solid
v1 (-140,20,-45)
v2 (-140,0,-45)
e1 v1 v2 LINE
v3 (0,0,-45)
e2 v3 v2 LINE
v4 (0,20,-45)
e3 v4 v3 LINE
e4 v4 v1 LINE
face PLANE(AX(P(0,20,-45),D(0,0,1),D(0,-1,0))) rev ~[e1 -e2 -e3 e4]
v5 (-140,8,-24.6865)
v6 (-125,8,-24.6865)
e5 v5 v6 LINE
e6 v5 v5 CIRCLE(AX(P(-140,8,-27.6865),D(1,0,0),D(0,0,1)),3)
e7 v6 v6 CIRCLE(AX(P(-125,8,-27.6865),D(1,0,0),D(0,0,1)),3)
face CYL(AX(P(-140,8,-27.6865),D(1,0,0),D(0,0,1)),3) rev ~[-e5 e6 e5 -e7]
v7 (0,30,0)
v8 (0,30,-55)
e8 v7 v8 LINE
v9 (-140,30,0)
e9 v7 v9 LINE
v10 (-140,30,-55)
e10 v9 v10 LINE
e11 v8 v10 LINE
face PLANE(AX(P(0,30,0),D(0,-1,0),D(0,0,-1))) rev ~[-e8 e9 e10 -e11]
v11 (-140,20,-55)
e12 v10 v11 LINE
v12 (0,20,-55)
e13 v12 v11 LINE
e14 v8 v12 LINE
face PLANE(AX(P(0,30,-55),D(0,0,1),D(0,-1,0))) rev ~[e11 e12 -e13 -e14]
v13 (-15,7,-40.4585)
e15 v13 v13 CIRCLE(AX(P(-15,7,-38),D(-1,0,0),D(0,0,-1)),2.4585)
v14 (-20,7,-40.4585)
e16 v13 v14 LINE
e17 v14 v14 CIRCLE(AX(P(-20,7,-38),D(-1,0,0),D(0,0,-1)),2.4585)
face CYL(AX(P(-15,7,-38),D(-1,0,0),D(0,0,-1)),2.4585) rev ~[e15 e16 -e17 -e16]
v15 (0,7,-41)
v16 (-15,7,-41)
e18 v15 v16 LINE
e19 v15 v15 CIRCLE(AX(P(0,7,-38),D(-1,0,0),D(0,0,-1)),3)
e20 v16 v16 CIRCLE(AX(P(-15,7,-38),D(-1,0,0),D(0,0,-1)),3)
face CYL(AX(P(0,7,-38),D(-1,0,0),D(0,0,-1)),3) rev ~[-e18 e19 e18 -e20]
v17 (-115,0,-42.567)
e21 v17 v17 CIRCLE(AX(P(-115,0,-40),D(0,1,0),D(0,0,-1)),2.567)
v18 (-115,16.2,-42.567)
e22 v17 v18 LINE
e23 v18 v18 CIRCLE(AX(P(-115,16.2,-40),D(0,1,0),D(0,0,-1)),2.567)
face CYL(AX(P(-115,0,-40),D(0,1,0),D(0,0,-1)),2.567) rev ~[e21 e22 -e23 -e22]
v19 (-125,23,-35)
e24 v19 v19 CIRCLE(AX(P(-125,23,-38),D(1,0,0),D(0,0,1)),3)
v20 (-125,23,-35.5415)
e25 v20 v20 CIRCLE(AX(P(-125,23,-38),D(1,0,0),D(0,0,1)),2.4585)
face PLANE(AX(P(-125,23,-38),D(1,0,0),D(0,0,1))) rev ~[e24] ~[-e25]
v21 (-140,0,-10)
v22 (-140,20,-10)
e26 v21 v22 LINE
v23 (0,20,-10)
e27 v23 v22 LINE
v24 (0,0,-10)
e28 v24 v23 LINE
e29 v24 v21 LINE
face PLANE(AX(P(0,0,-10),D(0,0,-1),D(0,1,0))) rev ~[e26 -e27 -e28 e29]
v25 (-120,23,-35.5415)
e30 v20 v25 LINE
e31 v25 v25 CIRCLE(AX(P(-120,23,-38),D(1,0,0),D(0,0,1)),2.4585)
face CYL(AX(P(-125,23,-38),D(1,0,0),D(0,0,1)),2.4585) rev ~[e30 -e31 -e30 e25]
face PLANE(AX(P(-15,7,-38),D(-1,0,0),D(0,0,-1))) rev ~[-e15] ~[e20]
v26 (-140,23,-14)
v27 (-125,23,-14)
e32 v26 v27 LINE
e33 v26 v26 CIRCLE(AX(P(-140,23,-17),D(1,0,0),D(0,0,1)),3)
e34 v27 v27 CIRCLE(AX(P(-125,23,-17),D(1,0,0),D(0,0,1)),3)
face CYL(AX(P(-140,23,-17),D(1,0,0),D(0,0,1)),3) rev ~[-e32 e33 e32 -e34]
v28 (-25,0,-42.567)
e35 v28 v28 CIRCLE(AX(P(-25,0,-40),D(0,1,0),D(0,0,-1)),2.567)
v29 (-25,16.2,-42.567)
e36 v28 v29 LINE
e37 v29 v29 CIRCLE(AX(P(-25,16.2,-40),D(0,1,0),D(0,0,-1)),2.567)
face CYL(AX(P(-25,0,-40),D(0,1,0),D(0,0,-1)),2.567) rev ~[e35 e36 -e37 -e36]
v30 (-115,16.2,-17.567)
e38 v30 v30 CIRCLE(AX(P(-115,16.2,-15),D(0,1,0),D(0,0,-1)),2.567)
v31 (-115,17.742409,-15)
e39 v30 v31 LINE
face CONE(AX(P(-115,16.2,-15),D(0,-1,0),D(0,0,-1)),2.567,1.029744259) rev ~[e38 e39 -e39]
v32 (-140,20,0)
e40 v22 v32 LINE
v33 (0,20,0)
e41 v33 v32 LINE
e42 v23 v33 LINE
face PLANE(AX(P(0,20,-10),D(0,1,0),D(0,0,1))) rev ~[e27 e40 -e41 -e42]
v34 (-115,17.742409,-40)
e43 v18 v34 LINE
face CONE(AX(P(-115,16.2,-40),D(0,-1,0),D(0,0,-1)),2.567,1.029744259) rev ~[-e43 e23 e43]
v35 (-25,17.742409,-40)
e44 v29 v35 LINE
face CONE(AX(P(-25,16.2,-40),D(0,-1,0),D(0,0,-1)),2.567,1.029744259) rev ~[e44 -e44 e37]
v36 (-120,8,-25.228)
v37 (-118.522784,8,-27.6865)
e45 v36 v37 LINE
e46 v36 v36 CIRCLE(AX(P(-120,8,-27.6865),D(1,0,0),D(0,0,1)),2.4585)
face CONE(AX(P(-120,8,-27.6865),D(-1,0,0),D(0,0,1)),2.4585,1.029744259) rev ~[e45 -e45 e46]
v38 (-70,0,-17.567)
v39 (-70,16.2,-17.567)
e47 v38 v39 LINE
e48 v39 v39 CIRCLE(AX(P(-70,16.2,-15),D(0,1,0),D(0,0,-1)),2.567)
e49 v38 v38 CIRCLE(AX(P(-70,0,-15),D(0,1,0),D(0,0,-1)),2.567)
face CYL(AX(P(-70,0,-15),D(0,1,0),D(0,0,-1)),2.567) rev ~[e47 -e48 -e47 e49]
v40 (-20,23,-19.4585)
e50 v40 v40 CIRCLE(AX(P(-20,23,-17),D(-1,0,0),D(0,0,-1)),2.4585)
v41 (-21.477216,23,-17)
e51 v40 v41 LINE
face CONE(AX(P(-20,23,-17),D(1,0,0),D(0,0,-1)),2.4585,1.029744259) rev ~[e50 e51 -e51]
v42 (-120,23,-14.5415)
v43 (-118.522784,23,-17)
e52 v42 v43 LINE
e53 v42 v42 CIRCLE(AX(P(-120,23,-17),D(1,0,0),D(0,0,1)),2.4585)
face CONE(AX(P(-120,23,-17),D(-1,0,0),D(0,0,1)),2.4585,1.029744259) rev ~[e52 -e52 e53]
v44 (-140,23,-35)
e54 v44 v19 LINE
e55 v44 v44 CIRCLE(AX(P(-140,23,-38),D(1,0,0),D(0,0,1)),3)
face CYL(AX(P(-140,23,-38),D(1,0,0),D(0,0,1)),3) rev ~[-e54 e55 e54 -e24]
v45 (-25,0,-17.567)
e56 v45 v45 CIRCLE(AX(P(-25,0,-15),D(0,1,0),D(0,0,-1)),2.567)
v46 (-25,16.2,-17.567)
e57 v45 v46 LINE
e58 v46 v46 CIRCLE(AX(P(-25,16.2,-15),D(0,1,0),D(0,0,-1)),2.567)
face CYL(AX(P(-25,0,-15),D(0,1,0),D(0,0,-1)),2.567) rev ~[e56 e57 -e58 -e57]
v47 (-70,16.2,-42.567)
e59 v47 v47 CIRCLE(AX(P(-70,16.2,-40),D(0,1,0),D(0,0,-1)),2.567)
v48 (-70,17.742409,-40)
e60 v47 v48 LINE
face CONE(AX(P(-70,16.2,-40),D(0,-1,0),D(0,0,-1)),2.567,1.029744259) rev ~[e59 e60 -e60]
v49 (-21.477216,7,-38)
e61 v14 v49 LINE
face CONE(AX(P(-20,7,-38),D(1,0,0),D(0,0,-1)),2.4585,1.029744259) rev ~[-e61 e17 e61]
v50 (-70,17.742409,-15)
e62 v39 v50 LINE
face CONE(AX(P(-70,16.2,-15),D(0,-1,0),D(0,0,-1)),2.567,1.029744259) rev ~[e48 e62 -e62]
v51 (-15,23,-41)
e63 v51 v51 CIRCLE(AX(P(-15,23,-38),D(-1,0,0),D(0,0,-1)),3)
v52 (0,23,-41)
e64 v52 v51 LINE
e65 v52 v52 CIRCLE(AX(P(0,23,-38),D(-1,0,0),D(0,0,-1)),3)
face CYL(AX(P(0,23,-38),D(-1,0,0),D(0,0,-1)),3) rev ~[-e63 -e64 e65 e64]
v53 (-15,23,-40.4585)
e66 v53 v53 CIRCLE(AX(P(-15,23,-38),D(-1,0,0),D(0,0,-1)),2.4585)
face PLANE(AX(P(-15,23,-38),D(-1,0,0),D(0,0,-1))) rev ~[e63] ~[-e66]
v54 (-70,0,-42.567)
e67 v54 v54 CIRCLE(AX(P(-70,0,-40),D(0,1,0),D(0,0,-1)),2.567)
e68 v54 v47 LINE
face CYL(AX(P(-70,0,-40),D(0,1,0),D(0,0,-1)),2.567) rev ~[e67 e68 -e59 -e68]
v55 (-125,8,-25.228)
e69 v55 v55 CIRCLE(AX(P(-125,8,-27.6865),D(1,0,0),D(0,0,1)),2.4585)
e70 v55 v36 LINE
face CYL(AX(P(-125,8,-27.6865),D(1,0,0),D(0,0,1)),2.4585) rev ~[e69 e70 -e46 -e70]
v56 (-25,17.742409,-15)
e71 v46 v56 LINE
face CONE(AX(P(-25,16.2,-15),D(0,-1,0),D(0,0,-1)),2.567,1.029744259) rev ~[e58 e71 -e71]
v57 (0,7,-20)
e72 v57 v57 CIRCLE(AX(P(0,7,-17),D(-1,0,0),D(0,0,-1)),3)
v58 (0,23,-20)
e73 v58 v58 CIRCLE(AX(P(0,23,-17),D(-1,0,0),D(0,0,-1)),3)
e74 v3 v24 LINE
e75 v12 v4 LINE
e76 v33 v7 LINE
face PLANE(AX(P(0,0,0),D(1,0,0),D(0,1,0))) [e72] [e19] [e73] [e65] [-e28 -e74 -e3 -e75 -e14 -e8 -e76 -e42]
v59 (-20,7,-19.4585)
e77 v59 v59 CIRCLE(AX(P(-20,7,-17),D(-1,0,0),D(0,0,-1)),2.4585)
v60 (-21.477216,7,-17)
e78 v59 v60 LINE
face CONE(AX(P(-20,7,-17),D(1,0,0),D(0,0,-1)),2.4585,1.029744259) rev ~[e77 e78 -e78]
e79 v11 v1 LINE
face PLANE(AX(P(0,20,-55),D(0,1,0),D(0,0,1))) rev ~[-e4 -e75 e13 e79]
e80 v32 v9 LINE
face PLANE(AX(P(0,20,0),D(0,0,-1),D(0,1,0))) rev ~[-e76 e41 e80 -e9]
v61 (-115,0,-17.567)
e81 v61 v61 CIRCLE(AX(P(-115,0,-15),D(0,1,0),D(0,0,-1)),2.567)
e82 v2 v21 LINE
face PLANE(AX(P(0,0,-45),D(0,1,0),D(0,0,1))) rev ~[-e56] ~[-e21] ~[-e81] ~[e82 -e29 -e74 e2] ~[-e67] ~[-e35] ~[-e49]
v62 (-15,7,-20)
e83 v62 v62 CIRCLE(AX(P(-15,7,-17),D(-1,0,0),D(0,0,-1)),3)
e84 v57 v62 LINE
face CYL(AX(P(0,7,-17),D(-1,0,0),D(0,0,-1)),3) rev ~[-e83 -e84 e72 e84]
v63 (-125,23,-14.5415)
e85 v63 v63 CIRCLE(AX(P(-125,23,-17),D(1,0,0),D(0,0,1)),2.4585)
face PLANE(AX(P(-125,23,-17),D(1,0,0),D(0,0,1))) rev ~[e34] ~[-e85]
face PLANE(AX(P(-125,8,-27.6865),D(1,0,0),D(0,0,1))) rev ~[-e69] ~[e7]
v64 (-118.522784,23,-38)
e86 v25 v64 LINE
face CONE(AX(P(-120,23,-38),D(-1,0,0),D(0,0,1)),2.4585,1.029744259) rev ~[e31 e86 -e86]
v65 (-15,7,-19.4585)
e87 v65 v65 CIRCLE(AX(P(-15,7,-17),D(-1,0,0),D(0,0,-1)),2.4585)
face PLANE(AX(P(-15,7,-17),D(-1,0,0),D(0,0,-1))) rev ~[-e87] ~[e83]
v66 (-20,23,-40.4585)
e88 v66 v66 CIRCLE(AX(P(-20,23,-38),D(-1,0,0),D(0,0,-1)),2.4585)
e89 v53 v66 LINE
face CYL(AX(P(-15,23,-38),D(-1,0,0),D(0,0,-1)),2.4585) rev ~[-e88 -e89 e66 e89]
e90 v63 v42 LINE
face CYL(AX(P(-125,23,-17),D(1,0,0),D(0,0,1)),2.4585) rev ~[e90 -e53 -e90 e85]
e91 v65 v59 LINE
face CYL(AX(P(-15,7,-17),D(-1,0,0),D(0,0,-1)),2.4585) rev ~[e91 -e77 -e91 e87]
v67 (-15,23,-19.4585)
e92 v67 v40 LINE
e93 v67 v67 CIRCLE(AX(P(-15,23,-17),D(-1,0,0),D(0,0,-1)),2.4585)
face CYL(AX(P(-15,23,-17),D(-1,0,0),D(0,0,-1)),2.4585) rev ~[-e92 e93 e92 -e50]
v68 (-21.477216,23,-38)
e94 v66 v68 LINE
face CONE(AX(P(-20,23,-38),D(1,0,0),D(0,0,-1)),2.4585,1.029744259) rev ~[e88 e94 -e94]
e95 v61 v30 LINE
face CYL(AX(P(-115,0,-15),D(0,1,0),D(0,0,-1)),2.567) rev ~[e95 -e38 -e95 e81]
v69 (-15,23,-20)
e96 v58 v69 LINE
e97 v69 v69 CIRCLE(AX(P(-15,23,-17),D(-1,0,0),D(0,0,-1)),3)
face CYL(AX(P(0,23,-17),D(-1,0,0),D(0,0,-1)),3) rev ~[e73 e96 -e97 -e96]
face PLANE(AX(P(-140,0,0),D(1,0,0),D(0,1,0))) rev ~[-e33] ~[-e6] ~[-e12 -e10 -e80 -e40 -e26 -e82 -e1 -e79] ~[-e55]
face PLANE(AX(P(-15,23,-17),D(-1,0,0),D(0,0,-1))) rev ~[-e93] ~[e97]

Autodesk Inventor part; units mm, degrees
ref_plane "YZ Plane" through (0, 0, 0) normal (1, 0, 0) x (0, 1, 0)
ref_plane "XZ Plane" through (0, 0, 0) normal (0, 1, 0) x (-1, 0, 0)
ref_plane "XY Plane" through (0, 0, 0) normal (0, 0, 1) x (1, 0, 0)
sketch "Sketch1" plane through (0, 0, 0) normal (1, 0, 0) x (0, 1, 0)
  line L0 (30, 0) -> (30, -55)
  line L1 (30, -55) -> (20, -55)
  line L2 (20, -55) -> (20, -45)
  line L3 (20, -45) -> (0, -45)
  line L4 (0, -45) -> (0, -10)
  line L5 (0, -10) -> (20, -10)
  line L6 (20, -10) -> (20, 0)
  line L7 (20, 0) -> (30, 0)
  point P0 (0, 0)
  dimension "d0" = 55
  dimension "d1" = 10
  dimension "d2" = 10
  dimension "d3" = 20
  dimension "d4" = 35
  dimension "d5" = 20
  dimension "d6" = 10
  dimension "d7" = 30
  dimension "d8" = 0
extrude "Extrusion1" add sketch "Sketch1" against normal blind 140
sketch "Sketch3" plane through (0, 0, 0) normal (1, 0, 0) x (0, 0, -1)
  line L0 (55, 30) -> (0, 30) projected
  line L1 (10, 20) -> (10, 0) projected
  line L2 (45, 0) -> (45, 20) projected
  line L3 (10, 0) -> (45, 0) projected
  point P0 (0, 0)
  point P1 (17, 23)
  point P2 (38, 23)
  point P3 (17, 7)
  point P4 (38, 7)
  dimension "d26" = 7
  dimension "d27" = 7
  dimension "d28" = 7
  dimension "d29" = 7
  dimension "d30" = 7
  dimension "d31" = 7
  dimension "d32" = 7
  dimension "d33" = 7
hole "Hole2" at (0, 23, -17) at (0, 23, -38) at (0, 7, -38) at (0, 7, -17) direction (-1, 0, 0) diameter 4.917 depth 20 tip angle 118 counterbore diameter 6 counterbore depth 15 thread size "M6x1" class "6H" standard "ISO Metric profile"
sketch "Sketch4" plane through (-140, 0, 0) normal (-1, 0, 0) x (0, 0, 1)
  line L0 (-45, 0) -> (-10, 0) projected
  line L1 (-45, 20) -> (-45, 0) projected
  line L2 (-10, 0) -> (-10, 20) projected
  point P0 (0, 0)
  point P1 (-38, 23)
  point P2 (-17, 23)
  point P3 (-27.6865, 8)
  dimension "d41" = 8
  dimension "d42" = 23
  dimension "d43" = 23
  dimension "d44" = 7
  dimension "d45" = 7
hole "Hole3" at (-140, 8, -27.6865) at (-140, 23, -38) at (-140, 23, -17) direction (1, 0, 0) diameter 4.917 depth 20 tip angle 118 counterbore diameter 6 counterbore depth 15 thread size "M6x1" class "6H" standard "ISO Metric profile"
sketch "Sketch5" plane through (0, 0, -45) normal (0, -1, 0) x (1, 0, 0)
  line L0 (0, 35) -> (0, 0) projected
  line L1 (0, 45) -> (-140, 45) projected
  line L2 (0, -10) -> (-140, -10) projected
  point P0 (-115, 30)
  point P1 (-70, 30)
  point P2 (-25, 30)
  point P3 (-115, 5)
  point P4 (-70, 5)
  point P5 (-25, 5)
  dimension "d53" = 25
  dimension "d61" = 25
  dimension "d62" = 15
  dimension "d63" = 15
  dimension "d64" = 15
  dimension "d65" = 15
  dimension "d66" = 15
  dimension "d67" = 15
  dimension "d68" = 45
  dimension "d69" = 45
  dimension "d70" = 45
  dimension "d71" = 45
hole "Hole4" at (-115, 0, -15) at (-70, 0, -15) at (-115, 0, -40) at (-70, 0, -40) at (-25, 0, -40) at (-25, 0, -15) direction (0, 1, 0) diameter 5.134 depth 16.2 tip angle 118 thread size "M6x0.8" class "6H" standard "ISO Metric profile"
properties part number "Fuhrung" material "Steel, Mild"
